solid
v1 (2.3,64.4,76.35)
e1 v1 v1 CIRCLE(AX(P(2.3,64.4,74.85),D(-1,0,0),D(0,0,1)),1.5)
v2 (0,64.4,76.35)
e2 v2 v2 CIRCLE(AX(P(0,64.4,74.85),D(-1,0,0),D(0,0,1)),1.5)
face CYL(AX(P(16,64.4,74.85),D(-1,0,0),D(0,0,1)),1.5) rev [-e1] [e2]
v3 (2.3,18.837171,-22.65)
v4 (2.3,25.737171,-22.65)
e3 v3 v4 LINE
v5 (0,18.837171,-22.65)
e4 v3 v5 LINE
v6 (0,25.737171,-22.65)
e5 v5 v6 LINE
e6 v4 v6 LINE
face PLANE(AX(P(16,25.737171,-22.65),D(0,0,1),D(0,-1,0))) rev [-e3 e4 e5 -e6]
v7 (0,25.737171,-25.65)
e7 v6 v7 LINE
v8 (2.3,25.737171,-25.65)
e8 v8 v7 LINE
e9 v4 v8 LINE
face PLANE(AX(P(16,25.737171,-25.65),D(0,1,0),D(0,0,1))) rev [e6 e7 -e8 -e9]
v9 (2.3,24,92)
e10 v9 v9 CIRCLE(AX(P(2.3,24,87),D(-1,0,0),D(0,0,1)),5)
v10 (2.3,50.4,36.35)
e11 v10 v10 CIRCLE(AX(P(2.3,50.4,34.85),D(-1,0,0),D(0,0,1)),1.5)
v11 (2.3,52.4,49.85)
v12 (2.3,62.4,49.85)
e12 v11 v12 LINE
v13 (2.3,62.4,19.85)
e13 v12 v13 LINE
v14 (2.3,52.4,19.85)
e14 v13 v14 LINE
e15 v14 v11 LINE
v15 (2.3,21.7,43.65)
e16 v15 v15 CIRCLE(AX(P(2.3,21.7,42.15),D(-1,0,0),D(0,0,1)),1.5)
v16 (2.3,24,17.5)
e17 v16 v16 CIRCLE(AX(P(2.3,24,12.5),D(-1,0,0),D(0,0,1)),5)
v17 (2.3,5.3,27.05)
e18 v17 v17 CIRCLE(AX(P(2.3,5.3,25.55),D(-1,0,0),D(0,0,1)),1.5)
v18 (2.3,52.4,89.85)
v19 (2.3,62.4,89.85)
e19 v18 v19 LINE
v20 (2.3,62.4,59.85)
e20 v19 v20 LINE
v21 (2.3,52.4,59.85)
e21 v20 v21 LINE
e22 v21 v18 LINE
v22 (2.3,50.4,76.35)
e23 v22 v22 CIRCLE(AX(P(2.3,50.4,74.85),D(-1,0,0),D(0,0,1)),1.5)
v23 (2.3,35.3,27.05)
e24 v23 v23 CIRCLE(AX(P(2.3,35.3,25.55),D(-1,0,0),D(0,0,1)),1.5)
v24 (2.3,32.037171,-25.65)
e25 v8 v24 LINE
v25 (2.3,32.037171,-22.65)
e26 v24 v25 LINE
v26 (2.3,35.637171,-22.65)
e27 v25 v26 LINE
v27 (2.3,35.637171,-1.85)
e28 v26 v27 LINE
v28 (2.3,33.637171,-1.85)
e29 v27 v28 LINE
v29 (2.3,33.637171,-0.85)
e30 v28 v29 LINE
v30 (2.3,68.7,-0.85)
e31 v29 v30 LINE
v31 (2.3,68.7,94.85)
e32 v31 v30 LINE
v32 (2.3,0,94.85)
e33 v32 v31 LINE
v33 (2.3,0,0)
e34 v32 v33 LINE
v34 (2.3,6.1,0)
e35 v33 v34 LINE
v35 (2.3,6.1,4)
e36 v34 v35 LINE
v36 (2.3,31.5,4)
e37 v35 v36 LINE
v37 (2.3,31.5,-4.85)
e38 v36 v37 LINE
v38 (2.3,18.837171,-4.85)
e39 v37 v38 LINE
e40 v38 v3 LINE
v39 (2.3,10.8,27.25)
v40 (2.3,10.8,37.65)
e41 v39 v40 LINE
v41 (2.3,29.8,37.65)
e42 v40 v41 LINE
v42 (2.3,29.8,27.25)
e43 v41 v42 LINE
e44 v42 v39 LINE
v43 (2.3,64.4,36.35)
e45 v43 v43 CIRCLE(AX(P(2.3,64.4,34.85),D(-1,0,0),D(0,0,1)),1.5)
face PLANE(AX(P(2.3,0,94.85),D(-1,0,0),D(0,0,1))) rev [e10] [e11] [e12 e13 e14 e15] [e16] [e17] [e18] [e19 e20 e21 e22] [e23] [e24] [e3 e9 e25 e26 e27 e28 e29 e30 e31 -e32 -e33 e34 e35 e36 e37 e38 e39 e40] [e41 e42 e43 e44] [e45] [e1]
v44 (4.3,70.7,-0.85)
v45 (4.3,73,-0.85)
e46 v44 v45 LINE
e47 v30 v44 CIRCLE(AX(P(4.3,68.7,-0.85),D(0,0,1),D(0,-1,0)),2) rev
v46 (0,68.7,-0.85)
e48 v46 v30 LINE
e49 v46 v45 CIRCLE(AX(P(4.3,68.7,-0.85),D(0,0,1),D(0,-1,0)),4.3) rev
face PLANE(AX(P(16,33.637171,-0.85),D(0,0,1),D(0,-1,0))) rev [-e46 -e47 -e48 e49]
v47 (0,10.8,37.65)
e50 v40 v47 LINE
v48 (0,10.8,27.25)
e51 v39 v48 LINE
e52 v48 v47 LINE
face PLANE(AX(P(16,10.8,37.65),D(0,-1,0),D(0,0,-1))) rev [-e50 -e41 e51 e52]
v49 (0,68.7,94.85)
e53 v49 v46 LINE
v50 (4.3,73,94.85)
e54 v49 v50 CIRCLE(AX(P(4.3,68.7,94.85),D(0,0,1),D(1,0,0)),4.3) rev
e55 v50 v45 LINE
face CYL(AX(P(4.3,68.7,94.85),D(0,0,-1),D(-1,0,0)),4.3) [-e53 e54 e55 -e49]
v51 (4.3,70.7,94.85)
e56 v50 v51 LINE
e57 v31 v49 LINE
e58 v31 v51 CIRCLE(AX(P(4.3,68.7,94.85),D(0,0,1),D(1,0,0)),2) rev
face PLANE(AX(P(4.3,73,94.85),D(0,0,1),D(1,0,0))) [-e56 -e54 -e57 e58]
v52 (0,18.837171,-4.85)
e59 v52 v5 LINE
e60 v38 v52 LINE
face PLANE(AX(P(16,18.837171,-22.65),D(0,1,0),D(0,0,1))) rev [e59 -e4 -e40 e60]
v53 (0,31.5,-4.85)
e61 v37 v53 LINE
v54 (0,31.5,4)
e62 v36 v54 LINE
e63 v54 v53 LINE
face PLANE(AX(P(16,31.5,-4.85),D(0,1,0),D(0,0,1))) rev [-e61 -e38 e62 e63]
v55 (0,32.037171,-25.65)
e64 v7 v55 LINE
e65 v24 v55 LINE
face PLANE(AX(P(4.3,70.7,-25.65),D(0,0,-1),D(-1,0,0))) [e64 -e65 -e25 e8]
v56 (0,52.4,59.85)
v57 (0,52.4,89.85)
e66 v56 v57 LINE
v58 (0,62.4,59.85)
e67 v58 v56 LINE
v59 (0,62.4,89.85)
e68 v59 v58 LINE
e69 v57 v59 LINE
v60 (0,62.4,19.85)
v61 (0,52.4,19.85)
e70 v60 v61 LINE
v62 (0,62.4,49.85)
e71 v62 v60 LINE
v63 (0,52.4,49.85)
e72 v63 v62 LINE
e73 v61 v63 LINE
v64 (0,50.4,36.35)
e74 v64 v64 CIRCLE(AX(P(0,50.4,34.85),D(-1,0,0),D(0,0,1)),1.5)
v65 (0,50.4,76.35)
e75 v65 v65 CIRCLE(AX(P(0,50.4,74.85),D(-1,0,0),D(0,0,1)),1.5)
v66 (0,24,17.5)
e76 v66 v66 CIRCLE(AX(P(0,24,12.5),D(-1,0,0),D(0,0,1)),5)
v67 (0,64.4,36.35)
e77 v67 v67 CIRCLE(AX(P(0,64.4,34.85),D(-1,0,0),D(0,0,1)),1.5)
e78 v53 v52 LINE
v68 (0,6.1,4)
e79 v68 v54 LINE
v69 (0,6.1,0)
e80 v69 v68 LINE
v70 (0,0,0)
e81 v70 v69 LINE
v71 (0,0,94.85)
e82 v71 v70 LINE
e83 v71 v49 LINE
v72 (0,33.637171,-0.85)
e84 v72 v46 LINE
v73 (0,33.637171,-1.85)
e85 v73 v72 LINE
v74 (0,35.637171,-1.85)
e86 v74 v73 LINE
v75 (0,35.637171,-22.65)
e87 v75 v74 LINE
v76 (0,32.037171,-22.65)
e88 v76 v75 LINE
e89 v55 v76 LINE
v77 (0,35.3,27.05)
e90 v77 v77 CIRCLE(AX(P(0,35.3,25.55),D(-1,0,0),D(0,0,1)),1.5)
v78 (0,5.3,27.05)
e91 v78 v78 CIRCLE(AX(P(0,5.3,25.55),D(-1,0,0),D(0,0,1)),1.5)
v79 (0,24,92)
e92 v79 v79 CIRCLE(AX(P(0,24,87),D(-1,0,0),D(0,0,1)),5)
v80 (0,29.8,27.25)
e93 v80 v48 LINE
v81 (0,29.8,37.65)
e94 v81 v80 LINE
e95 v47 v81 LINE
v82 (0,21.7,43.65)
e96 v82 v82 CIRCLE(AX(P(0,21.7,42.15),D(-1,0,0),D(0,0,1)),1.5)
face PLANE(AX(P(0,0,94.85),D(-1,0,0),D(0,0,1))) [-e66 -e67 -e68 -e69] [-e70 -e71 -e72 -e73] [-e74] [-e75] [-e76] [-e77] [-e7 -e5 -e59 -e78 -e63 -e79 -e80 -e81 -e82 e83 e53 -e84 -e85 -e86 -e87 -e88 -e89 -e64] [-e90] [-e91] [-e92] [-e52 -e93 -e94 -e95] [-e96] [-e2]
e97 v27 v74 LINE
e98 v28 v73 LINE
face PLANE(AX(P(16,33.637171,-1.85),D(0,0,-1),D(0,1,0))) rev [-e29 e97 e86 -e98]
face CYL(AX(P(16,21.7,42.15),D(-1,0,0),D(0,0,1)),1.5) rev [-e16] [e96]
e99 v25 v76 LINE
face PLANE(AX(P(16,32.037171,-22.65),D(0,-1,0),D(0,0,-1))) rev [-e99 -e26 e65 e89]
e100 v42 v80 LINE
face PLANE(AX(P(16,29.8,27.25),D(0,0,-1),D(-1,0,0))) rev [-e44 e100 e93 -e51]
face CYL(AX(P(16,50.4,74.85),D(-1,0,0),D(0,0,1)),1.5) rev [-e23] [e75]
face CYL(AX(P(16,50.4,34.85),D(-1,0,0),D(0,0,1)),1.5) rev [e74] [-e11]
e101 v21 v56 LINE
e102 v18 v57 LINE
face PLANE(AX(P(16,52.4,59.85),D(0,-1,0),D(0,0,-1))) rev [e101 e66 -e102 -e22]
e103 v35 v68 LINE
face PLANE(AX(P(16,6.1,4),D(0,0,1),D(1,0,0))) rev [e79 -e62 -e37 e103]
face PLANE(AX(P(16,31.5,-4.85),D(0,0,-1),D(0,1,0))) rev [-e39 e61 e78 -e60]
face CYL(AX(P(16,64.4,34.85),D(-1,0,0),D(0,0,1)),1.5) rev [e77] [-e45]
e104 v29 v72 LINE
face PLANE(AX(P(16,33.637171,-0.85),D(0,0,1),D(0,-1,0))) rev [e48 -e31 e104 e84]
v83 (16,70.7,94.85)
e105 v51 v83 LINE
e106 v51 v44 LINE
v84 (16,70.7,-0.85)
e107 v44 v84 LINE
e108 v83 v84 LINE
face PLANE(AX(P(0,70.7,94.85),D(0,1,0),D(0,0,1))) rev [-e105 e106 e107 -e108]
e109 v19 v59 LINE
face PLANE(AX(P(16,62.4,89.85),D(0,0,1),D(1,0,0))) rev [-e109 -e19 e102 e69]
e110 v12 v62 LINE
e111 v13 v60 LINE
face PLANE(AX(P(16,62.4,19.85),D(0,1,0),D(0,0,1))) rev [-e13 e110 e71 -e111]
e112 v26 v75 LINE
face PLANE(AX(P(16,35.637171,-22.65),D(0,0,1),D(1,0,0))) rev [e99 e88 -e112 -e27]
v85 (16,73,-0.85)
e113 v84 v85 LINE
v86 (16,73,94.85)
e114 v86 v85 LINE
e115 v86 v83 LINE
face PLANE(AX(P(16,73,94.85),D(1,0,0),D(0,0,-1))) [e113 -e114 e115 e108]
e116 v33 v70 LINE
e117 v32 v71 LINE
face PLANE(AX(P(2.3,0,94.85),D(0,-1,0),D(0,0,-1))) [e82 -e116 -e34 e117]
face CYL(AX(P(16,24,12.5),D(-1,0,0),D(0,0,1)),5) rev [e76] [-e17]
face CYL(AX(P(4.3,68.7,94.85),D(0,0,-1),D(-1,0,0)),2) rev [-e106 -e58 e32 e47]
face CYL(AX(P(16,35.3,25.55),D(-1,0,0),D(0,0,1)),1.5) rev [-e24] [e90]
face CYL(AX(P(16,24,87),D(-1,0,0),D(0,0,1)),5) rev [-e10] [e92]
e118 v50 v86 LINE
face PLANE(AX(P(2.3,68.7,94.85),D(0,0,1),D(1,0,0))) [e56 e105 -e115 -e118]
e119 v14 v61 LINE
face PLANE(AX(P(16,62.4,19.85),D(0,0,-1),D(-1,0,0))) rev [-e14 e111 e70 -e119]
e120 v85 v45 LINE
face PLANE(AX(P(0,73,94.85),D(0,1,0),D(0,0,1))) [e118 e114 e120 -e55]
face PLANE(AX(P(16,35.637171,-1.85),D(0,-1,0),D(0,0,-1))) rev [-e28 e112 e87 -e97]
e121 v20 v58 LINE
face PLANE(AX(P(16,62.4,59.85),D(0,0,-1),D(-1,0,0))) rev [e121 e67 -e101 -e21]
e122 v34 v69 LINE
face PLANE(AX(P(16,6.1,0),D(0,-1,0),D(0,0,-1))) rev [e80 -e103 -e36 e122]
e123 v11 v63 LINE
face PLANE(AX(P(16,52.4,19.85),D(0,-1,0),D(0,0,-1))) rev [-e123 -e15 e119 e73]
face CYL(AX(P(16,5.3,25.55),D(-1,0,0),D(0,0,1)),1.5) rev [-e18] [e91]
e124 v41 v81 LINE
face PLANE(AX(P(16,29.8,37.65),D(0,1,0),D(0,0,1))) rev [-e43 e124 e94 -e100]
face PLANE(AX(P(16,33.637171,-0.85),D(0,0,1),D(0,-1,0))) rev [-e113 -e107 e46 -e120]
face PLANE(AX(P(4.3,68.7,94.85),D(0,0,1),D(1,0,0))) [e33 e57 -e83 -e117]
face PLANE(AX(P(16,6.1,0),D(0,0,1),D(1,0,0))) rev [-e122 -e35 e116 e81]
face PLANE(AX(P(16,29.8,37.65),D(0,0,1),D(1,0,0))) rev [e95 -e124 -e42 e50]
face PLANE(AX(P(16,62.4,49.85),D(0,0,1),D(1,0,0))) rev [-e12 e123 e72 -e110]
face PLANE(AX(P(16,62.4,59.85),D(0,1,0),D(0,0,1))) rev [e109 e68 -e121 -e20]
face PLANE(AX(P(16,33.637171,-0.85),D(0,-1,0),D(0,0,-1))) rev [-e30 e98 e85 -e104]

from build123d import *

# Parameters (mm, degrees)
BASE_FLANGE1_DEPTH      = 94.85
BASE_FLANGE1_DEPTH_BACK = 25.65
SKETCH7_R               = 1.5
SKETCH7_R_2             = 5
SKETCH7_W               = 10.4
SKETCH7_H               = 19
SKETCH7_W_2             = 30
SKETCH7_H_2             = 10
CUT_EXTRUDE2_DEPTH      = 121.75397509


# Sheet-metal steps are written as plain solids
with BuildPart() as part:
    # Sketch2 → Base-Flange1 (new, two sides: drawn at the far end of the back side and taken through both)
    with BuildSketch(Plane.XY.offset(-BASE_FLANGE1_DEPTH_BACK)):
        with BuildLine():
            Line((0, 0), (0, 68.7))
            ThreePointArc((0, 68.7), (1.259440841, 71.740559159), (4.3, 73))
            Line((4.3, 73), (16, 73))
            Line((16, 73), (16, 70.7))
            Line((16, 70.7), (4.3, 70.7))
            ThreePointArc((4.3, 70.7), (2.885786438, 70.114213562), (2.3, 68.7))
            Line((2.3, 68.7), (2.3, 0))
            Line((2.3, 0), (0, 0))
        make_face()
    extrude(amount=BASE_FLANGE1_DEPTH + BASE_FLANGE1_DEPTH_BACK)

    # Sketch7 → Cut-Extrude2 (cut, through all)
    with BuildSketch(Plane.ZY):
        with Locations((34.85, 64.4)):
            Circle(SKETCH7_R)
        with Locations((34.85, 50.4)):
            Circle(SKETCH7_R)
        with Locations((74.85, 64.4)):
            Circle(SKETCH7_R)
        with Locations((74.85, 50.4)):
            Circle(SKETCH7_R)
        with Locations((25.55, 35.3)):
            Circle(SKETCH7_R)
        with Locations((25.55, 5.3)):
            Circle(SKETCH7_R)
        with Locations((42.15, 21.7)):
            Circle(SKETCH7_R)
        with Locations((87, 24)):
            Circle(SKETCH7_R_2)
        with Locations((12.5, 24)):
            Circle(SKETCH7_R_2)
        with Locations((32.45, 20.3)):
            Rectangle(SKETCH7_W, SKETCH7_H)
        with Locations((74.85, 57.4)):
            Rectangle(SKETCH7_W_2, SKETCH7_H_2)
        with Locations((34.85, 57.4)):
            Rectangle(SKETCH7_W_2, SKETCH7_H_2)
        Polygon((-0.85, 33.637171027), (-1.85, 33.637171027), (-1.85, 35.637171027), (-22.65, 35.637171027), (-22.65, 32.037171027), (-25.65, 32.037171027), (-25.65, 73), (-0.85, 73), align=None)
        Polygon((-22.65, 25.737171027), (-22.65, 18.837171027), (-4.85, 18.837171027), (-4.85, 31.5), (4, 31.5), (4, 6.1), (0, 6.1), (0, 0), (-25.65, 0), (-25.65, 25.737171027), align=None)
    extrude(amount=-CUT_EXTRUDE2_DEPTH, mode=Mode.SUBTRACT)


solid = part.part
